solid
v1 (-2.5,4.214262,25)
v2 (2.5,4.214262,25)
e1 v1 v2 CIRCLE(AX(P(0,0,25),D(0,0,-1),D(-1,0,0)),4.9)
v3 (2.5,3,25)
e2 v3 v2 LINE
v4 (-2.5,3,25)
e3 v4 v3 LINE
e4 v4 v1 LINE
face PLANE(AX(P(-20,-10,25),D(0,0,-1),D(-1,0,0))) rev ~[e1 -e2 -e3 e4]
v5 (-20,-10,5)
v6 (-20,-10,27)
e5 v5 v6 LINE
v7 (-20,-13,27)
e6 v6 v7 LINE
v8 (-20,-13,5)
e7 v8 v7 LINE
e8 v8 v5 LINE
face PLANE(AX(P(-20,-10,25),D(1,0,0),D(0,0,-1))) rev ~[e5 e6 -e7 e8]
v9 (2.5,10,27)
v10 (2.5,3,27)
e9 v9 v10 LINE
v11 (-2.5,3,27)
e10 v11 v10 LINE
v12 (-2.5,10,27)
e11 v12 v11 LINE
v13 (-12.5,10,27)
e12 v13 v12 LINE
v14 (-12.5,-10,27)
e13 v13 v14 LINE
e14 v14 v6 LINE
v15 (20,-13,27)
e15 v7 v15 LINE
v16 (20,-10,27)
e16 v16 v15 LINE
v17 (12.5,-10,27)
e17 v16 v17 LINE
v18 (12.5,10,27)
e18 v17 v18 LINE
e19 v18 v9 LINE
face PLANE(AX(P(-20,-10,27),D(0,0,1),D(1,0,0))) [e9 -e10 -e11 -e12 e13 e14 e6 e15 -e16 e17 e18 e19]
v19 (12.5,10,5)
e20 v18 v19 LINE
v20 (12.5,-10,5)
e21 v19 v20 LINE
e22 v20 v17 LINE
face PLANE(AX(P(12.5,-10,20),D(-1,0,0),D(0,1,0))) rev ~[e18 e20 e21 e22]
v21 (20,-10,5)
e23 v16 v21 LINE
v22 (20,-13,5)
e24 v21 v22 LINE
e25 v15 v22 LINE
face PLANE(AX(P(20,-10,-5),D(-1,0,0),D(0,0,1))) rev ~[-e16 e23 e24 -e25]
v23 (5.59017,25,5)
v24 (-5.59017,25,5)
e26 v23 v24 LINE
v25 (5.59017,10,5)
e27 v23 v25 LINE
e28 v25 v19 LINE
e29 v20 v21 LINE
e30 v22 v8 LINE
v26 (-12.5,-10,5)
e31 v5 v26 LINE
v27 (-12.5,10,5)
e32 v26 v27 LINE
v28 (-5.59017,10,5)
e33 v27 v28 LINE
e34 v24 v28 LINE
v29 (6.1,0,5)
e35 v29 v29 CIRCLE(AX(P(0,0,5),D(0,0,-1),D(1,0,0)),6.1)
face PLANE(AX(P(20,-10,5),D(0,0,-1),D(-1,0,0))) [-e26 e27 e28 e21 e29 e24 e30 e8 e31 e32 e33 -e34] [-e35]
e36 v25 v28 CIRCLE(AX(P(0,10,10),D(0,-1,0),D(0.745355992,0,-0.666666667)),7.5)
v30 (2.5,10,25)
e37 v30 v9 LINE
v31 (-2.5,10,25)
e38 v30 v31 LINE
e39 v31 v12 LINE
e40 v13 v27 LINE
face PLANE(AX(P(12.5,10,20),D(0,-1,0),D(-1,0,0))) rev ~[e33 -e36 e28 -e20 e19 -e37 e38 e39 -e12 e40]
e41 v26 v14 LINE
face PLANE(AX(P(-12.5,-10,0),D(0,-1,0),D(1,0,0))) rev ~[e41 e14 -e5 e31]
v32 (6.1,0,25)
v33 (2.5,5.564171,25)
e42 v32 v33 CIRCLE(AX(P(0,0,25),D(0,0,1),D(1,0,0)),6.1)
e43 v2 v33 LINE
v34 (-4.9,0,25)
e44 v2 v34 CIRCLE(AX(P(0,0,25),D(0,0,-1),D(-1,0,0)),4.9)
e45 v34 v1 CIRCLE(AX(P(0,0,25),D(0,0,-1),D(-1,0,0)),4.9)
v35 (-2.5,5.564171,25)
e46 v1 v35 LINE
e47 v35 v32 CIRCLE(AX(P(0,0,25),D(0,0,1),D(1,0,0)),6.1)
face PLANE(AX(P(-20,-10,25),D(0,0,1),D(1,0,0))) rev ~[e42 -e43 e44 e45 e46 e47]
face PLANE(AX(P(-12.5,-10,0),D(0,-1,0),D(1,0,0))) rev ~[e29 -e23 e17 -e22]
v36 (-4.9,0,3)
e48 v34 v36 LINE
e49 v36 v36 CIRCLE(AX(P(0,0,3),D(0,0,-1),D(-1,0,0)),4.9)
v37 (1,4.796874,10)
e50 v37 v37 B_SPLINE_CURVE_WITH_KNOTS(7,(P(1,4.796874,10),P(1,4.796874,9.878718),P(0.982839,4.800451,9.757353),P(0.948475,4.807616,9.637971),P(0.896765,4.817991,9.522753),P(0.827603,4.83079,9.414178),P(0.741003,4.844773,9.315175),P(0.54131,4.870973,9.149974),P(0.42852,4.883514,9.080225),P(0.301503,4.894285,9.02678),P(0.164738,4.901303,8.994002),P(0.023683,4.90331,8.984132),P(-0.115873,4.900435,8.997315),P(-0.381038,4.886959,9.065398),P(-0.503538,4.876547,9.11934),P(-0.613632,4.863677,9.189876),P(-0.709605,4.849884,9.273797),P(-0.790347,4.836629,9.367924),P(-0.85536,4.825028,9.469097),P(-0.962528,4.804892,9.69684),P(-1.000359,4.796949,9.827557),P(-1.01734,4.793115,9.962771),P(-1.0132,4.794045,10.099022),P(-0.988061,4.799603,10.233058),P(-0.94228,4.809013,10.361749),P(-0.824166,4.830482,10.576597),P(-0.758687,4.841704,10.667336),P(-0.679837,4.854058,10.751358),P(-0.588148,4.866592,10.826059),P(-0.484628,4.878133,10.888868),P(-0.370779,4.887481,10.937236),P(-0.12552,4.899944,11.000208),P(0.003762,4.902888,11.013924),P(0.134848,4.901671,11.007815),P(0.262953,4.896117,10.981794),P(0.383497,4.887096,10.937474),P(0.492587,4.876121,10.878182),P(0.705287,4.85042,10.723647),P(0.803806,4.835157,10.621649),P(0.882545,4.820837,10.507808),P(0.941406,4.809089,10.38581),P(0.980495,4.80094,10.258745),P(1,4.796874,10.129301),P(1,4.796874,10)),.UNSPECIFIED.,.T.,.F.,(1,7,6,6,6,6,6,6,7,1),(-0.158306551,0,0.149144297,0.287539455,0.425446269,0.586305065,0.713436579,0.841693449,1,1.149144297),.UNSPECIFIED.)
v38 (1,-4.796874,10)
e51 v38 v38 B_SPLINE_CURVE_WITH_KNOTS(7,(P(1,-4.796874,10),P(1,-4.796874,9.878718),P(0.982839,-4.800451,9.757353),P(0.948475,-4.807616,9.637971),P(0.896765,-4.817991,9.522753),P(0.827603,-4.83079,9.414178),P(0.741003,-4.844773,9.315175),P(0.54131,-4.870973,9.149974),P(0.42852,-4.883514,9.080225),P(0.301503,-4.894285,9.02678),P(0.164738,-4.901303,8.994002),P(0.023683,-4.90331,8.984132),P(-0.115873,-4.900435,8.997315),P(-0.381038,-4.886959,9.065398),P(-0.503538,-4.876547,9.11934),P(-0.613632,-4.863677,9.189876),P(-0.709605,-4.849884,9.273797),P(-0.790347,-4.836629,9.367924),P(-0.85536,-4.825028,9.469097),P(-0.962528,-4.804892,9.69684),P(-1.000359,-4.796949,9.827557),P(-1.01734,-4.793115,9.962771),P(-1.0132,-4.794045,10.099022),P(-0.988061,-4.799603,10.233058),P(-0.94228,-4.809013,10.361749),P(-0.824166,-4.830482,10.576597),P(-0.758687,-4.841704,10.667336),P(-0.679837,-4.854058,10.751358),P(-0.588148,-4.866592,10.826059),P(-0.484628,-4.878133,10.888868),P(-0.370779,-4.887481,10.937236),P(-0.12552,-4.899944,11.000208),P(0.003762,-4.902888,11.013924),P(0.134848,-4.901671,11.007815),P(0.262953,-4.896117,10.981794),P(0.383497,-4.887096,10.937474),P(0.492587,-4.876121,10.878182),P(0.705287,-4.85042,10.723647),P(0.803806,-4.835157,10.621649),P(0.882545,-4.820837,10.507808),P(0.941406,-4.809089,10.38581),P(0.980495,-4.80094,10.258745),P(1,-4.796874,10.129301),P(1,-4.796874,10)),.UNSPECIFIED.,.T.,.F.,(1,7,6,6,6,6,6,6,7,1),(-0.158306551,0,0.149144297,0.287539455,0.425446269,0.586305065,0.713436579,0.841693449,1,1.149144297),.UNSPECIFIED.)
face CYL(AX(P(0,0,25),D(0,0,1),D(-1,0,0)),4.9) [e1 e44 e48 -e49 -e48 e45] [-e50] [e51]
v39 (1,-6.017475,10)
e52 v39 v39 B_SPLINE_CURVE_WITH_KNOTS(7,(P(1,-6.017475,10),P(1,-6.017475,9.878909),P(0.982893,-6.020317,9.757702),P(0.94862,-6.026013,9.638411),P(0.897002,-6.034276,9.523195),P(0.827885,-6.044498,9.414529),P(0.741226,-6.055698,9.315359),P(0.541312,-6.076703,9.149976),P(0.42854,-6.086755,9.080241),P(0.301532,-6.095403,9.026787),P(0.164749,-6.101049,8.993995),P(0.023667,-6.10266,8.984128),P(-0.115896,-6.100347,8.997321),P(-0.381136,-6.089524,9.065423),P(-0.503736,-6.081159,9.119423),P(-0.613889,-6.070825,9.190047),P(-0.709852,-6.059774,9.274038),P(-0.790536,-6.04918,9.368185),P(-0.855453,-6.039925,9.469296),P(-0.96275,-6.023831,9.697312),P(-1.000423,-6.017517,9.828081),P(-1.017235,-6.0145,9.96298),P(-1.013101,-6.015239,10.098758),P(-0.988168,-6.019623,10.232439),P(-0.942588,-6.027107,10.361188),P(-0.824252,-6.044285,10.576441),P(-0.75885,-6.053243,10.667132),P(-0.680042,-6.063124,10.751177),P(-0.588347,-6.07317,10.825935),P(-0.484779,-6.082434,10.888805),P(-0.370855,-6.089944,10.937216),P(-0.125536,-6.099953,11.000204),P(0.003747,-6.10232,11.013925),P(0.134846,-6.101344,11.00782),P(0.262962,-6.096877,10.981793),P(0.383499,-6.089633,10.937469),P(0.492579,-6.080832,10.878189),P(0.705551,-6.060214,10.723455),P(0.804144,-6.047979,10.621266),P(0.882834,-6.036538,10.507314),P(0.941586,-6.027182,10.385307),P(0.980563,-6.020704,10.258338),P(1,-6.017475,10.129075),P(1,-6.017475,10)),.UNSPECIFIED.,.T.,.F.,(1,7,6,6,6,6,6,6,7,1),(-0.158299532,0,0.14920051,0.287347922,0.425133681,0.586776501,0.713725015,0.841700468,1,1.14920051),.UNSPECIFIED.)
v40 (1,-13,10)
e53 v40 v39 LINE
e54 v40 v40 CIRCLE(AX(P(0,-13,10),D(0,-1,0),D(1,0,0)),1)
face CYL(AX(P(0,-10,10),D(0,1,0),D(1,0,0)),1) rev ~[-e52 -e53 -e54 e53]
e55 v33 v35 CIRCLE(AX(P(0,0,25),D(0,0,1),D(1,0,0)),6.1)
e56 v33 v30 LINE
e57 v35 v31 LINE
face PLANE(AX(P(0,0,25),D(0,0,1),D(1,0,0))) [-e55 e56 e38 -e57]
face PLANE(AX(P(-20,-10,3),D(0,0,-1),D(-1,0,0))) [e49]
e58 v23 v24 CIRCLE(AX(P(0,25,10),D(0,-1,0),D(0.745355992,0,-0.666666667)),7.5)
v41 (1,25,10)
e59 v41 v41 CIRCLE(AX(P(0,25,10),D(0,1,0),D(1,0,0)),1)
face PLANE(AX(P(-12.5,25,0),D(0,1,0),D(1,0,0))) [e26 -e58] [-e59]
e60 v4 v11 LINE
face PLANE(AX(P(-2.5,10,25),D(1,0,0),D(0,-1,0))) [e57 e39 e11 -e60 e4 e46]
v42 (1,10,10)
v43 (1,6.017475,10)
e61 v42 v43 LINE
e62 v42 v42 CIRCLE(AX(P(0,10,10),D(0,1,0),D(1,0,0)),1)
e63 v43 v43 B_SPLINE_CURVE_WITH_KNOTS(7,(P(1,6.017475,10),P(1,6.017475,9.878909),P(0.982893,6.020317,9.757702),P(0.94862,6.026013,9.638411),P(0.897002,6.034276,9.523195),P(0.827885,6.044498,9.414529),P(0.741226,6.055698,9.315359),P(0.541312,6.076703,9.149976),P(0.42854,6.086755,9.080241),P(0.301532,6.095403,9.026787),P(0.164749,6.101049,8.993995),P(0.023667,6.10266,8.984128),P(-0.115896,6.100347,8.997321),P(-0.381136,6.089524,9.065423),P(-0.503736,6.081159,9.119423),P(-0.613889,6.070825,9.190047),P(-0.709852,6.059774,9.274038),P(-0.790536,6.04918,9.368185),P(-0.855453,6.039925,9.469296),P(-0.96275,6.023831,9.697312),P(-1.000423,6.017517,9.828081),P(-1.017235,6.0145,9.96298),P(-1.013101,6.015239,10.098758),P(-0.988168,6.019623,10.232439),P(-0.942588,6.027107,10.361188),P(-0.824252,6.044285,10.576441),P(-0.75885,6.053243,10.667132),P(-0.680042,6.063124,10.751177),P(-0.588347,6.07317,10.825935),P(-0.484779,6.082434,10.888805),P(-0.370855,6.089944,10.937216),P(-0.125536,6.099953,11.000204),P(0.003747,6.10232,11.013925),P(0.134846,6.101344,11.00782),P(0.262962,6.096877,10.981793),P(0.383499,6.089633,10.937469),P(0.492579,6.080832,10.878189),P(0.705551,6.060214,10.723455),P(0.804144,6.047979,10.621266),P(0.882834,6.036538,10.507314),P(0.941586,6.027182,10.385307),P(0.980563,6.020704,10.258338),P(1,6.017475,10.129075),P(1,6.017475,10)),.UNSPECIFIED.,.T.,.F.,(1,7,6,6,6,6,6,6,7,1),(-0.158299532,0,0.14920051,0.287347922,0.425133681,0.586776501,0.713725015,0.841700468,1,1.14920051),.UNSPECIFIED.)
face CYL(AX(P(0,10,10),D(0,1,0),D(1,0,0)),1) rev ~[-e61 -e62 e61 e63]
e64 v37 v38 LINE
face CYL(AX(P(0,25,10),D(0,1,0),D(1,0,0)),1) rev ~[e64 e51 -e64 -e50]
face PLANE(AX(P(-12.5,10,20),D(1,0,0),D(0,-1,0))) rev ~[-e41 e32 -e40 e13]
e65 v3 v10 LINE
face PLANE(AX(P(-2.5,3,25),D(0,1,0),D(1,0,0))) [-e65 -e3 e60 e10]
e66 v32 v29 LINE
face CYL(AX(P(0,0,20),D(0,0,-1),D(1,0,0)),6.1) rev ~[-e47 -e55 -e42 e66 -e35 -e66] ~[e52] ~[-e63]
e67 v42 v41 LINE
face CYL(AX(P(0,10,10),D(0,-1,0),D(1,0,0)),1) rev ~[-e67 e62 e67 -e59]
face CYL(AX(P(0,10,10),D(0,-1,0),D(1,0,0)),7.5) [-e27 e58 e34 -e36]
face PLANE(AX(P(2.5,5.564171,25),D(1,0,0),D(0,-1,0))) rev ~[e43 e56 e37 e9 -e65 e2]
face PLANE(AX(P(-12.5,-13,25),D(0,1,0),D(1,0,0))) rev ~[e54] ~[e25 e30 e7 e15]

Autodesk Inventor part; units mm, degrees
ref_plane "YZ Plane" through (0, 0, 0) normal (1, 0, 0) x (0, 1, 0)
ref_plane "XZ Plane" through (0, 0, 0) normal (0, 1, 0) x (-1, 0, 0)
ref_plane "XY Plane" through (0, 0, 0) normal (0, 0, 1) x (1, 0, 0)
sketch "Sketch1" plane through (0, 0, 0) normal (0, 0, 1) x (1, 0, 0)
  circle A0 centre (0, 0) radius 6.1
  line L0 (-12.5, -10) -> (12.5, -10)
  line L1 (12.5, -10) -> (12.5, 10)
  line L2 (12.5, 10) -> (-12.5, 10)
  line L3 (-12.5, 10) -> (-12.5, -10)
  line L4 (-12.5, -10) -> (12.5, 10) construction
  line L5 (12.5, -10) -> (-12.5, 10) construction
  dimension "d0" = 12.2
  dimension "d1" = 25
  dimension "d2" = 20
extrude "Extrusion1" add sketch "Sketch1" along normal blind 20
sketch "Sketch2" plane through (-12.5, 10, 0) normal (0, 1, 0) x (1, 0, 0)
  line L0 (0, 0) -> (0, -20) construction
  line L1 (25, -20) -> (0, -20) construction
  line L2 (0, 0) -> (25, -20) construction
  line L3 (0, -20) -> (25, 0) construction
  circle A0 centre (12.5, -10) radius 1
  point P0 (12.5, 0)
  dimension "d5" = 2
extrude "Extrusion2" cut sketch "Sketch2" against normal blind 100
sketch "Sketch3" plane through (-12.5, 10, 0) normal (0, 1, 0) x (1, 0, 0)
  circle A0 centre (12.5, -10) radius 1 projected
  line L0 (25, 0) -> (0, 0) projected
  line L1 (0, 0) -> (0, -20) projected
  line L2 (25, -20) -> (0, -20) projected
  line L3 (25, 0) -> (25, -20) projected
  circle A1 centre (12.5, -10) radius 7.5
  point P0 (12.5, 0)
  dimension "d8" = 15
extrude "Extrusion3" add sketch "Sketch3" along normal blind 15 contours A1
sketch "Sketch4" plane through (-12.5, -10, 0) normal (0, -1, 0) x (1, 0, 0)
  line L0 (32.5, 25) -> (-7.5, 25)
  line L1 (-7.5, 25) -> (-7.5, -5)
  line L2 (-7.5, -5) -> (32.5, -5)
  line L3 (32.5, -5) -> (32.5, 25)
  circle A0 centre (12.5, 10) radius 1 projected
  line L4 (32.5, 25) -> (-7.5, -5) construction
  line L5 (-7.5, 25) -> (32.5, -5) construction
  point P0 (12.5, 0)
  dimension "d11" = 30
  dimension "d12" = 40
extrude "Extrusion4" add sketch "Sketch4" along normal blind 3
thicken "Thicken1" operation add thickness 5 both sides no extend neighbours yes toward (0, 0, 1) faces at (-10.3667, 0, 20)
sketch "Sketch5" plane through (-20, -10, 25) normal (0, 0, 1) x (1, 0, 0)
  line L0 (7.5, 20) -> (7.5, 0) projected
  line L1 (0, -3) -> (40, -3) projected
  line L2 (7.5, 20) -> (17.5, 20)
  line L3 (17.5, 20) -> (17.5, -3)
  line L4 (17.5, -3) -> (7.5, -3)
  line L5 (7.5, -3) -> (7.5, 20)
  line L6 (32.5, 0) -> (32.5, 20) projected
  line L7 (32.5, 20) -> (22.5, 20)
  line L8 (22.5, 20) -> (22.5, -3)
  line L9 (22.5, -3) -> (32.5, -3)
  line L10 (32.5, -3) -> (32.5, 20)
  line L11 (32.5, 0) -> (32.5, 20) projected
  line L12 (32.5, 20) -> (7.5, 20) projected
  line L13 (7.5, 20) -> (7.5, 0) projected
  line L14 (7.5, 0) -> (0, 0) projected
  line L15 (0, 0) -> (0, -3) projected
  line L16 (40, -3) -> (0, -3) projected
  line L17 (40, 0) -> (40, -3) projected
  line L18 (40, 0) -> (32.5, 0) projected
  circle A0 centre (20, 10) radius 6.1 projected
  line L19 (17.5, 13) -> (22.5, 13)
  point P0 (22.5, -3)
  dimension "d17" = 10
  dimension "d18" = 10
  dimension "d28" = 3
extrude "Extrusion5" add sketch "Sketch5" along normal blind 2 contours L2 L3 A0 L1 L5 L0 | L5 L1 L15 L14 | L3 A0 | L7 L6 L10 L1 L8 A0 | L3 A0 L8 L1 | L19 L8 A0 L3 | A0 L8 | L18 L17 L1 L10 picked at (20, 9.9667)
sketch "Sketch6" plane through (20, -10, -5) normal (0, 0, -1) x (-1, 0, 0)
  line L0 (-13.3468, 43.0165) -> (63.7046, 43.0165)
  line L1 (63.7046, 43.0165) -> (63.7046, -16.6019)
  line L2 (63.7046, -16.6019) -> (-13.3468, -16.6019)
  line L3 (-13.3468, -16.6019) -> (-13.3468, 43.0165)
  point P0 (20, 10)
extrude "Extrusion6" cut sketch "Sketch6" against normal blind 10
sketch "Sketch7" plane through (-20, -10, 25) normal (0, 0, -1) x (-1, 0, 0)
  circle A0 centre (-20, 10) radius 4.9
  dimension "d23" = 9.8
extrude "Extrusion7" add sketch "Sketch7" along normal blind 22
sketch "Sketch8" plane through (-12.5, 25, 0) normal (0, 1, 0) x (1, 0, 0)
  circle A0 centre (12.5, -10) radius 1 projected
  point P0 (12.5, 0)
extrude "Extrusion8" cut sketch "Sketch8" against normal blind 100
properties part number "New_hinge_template"
